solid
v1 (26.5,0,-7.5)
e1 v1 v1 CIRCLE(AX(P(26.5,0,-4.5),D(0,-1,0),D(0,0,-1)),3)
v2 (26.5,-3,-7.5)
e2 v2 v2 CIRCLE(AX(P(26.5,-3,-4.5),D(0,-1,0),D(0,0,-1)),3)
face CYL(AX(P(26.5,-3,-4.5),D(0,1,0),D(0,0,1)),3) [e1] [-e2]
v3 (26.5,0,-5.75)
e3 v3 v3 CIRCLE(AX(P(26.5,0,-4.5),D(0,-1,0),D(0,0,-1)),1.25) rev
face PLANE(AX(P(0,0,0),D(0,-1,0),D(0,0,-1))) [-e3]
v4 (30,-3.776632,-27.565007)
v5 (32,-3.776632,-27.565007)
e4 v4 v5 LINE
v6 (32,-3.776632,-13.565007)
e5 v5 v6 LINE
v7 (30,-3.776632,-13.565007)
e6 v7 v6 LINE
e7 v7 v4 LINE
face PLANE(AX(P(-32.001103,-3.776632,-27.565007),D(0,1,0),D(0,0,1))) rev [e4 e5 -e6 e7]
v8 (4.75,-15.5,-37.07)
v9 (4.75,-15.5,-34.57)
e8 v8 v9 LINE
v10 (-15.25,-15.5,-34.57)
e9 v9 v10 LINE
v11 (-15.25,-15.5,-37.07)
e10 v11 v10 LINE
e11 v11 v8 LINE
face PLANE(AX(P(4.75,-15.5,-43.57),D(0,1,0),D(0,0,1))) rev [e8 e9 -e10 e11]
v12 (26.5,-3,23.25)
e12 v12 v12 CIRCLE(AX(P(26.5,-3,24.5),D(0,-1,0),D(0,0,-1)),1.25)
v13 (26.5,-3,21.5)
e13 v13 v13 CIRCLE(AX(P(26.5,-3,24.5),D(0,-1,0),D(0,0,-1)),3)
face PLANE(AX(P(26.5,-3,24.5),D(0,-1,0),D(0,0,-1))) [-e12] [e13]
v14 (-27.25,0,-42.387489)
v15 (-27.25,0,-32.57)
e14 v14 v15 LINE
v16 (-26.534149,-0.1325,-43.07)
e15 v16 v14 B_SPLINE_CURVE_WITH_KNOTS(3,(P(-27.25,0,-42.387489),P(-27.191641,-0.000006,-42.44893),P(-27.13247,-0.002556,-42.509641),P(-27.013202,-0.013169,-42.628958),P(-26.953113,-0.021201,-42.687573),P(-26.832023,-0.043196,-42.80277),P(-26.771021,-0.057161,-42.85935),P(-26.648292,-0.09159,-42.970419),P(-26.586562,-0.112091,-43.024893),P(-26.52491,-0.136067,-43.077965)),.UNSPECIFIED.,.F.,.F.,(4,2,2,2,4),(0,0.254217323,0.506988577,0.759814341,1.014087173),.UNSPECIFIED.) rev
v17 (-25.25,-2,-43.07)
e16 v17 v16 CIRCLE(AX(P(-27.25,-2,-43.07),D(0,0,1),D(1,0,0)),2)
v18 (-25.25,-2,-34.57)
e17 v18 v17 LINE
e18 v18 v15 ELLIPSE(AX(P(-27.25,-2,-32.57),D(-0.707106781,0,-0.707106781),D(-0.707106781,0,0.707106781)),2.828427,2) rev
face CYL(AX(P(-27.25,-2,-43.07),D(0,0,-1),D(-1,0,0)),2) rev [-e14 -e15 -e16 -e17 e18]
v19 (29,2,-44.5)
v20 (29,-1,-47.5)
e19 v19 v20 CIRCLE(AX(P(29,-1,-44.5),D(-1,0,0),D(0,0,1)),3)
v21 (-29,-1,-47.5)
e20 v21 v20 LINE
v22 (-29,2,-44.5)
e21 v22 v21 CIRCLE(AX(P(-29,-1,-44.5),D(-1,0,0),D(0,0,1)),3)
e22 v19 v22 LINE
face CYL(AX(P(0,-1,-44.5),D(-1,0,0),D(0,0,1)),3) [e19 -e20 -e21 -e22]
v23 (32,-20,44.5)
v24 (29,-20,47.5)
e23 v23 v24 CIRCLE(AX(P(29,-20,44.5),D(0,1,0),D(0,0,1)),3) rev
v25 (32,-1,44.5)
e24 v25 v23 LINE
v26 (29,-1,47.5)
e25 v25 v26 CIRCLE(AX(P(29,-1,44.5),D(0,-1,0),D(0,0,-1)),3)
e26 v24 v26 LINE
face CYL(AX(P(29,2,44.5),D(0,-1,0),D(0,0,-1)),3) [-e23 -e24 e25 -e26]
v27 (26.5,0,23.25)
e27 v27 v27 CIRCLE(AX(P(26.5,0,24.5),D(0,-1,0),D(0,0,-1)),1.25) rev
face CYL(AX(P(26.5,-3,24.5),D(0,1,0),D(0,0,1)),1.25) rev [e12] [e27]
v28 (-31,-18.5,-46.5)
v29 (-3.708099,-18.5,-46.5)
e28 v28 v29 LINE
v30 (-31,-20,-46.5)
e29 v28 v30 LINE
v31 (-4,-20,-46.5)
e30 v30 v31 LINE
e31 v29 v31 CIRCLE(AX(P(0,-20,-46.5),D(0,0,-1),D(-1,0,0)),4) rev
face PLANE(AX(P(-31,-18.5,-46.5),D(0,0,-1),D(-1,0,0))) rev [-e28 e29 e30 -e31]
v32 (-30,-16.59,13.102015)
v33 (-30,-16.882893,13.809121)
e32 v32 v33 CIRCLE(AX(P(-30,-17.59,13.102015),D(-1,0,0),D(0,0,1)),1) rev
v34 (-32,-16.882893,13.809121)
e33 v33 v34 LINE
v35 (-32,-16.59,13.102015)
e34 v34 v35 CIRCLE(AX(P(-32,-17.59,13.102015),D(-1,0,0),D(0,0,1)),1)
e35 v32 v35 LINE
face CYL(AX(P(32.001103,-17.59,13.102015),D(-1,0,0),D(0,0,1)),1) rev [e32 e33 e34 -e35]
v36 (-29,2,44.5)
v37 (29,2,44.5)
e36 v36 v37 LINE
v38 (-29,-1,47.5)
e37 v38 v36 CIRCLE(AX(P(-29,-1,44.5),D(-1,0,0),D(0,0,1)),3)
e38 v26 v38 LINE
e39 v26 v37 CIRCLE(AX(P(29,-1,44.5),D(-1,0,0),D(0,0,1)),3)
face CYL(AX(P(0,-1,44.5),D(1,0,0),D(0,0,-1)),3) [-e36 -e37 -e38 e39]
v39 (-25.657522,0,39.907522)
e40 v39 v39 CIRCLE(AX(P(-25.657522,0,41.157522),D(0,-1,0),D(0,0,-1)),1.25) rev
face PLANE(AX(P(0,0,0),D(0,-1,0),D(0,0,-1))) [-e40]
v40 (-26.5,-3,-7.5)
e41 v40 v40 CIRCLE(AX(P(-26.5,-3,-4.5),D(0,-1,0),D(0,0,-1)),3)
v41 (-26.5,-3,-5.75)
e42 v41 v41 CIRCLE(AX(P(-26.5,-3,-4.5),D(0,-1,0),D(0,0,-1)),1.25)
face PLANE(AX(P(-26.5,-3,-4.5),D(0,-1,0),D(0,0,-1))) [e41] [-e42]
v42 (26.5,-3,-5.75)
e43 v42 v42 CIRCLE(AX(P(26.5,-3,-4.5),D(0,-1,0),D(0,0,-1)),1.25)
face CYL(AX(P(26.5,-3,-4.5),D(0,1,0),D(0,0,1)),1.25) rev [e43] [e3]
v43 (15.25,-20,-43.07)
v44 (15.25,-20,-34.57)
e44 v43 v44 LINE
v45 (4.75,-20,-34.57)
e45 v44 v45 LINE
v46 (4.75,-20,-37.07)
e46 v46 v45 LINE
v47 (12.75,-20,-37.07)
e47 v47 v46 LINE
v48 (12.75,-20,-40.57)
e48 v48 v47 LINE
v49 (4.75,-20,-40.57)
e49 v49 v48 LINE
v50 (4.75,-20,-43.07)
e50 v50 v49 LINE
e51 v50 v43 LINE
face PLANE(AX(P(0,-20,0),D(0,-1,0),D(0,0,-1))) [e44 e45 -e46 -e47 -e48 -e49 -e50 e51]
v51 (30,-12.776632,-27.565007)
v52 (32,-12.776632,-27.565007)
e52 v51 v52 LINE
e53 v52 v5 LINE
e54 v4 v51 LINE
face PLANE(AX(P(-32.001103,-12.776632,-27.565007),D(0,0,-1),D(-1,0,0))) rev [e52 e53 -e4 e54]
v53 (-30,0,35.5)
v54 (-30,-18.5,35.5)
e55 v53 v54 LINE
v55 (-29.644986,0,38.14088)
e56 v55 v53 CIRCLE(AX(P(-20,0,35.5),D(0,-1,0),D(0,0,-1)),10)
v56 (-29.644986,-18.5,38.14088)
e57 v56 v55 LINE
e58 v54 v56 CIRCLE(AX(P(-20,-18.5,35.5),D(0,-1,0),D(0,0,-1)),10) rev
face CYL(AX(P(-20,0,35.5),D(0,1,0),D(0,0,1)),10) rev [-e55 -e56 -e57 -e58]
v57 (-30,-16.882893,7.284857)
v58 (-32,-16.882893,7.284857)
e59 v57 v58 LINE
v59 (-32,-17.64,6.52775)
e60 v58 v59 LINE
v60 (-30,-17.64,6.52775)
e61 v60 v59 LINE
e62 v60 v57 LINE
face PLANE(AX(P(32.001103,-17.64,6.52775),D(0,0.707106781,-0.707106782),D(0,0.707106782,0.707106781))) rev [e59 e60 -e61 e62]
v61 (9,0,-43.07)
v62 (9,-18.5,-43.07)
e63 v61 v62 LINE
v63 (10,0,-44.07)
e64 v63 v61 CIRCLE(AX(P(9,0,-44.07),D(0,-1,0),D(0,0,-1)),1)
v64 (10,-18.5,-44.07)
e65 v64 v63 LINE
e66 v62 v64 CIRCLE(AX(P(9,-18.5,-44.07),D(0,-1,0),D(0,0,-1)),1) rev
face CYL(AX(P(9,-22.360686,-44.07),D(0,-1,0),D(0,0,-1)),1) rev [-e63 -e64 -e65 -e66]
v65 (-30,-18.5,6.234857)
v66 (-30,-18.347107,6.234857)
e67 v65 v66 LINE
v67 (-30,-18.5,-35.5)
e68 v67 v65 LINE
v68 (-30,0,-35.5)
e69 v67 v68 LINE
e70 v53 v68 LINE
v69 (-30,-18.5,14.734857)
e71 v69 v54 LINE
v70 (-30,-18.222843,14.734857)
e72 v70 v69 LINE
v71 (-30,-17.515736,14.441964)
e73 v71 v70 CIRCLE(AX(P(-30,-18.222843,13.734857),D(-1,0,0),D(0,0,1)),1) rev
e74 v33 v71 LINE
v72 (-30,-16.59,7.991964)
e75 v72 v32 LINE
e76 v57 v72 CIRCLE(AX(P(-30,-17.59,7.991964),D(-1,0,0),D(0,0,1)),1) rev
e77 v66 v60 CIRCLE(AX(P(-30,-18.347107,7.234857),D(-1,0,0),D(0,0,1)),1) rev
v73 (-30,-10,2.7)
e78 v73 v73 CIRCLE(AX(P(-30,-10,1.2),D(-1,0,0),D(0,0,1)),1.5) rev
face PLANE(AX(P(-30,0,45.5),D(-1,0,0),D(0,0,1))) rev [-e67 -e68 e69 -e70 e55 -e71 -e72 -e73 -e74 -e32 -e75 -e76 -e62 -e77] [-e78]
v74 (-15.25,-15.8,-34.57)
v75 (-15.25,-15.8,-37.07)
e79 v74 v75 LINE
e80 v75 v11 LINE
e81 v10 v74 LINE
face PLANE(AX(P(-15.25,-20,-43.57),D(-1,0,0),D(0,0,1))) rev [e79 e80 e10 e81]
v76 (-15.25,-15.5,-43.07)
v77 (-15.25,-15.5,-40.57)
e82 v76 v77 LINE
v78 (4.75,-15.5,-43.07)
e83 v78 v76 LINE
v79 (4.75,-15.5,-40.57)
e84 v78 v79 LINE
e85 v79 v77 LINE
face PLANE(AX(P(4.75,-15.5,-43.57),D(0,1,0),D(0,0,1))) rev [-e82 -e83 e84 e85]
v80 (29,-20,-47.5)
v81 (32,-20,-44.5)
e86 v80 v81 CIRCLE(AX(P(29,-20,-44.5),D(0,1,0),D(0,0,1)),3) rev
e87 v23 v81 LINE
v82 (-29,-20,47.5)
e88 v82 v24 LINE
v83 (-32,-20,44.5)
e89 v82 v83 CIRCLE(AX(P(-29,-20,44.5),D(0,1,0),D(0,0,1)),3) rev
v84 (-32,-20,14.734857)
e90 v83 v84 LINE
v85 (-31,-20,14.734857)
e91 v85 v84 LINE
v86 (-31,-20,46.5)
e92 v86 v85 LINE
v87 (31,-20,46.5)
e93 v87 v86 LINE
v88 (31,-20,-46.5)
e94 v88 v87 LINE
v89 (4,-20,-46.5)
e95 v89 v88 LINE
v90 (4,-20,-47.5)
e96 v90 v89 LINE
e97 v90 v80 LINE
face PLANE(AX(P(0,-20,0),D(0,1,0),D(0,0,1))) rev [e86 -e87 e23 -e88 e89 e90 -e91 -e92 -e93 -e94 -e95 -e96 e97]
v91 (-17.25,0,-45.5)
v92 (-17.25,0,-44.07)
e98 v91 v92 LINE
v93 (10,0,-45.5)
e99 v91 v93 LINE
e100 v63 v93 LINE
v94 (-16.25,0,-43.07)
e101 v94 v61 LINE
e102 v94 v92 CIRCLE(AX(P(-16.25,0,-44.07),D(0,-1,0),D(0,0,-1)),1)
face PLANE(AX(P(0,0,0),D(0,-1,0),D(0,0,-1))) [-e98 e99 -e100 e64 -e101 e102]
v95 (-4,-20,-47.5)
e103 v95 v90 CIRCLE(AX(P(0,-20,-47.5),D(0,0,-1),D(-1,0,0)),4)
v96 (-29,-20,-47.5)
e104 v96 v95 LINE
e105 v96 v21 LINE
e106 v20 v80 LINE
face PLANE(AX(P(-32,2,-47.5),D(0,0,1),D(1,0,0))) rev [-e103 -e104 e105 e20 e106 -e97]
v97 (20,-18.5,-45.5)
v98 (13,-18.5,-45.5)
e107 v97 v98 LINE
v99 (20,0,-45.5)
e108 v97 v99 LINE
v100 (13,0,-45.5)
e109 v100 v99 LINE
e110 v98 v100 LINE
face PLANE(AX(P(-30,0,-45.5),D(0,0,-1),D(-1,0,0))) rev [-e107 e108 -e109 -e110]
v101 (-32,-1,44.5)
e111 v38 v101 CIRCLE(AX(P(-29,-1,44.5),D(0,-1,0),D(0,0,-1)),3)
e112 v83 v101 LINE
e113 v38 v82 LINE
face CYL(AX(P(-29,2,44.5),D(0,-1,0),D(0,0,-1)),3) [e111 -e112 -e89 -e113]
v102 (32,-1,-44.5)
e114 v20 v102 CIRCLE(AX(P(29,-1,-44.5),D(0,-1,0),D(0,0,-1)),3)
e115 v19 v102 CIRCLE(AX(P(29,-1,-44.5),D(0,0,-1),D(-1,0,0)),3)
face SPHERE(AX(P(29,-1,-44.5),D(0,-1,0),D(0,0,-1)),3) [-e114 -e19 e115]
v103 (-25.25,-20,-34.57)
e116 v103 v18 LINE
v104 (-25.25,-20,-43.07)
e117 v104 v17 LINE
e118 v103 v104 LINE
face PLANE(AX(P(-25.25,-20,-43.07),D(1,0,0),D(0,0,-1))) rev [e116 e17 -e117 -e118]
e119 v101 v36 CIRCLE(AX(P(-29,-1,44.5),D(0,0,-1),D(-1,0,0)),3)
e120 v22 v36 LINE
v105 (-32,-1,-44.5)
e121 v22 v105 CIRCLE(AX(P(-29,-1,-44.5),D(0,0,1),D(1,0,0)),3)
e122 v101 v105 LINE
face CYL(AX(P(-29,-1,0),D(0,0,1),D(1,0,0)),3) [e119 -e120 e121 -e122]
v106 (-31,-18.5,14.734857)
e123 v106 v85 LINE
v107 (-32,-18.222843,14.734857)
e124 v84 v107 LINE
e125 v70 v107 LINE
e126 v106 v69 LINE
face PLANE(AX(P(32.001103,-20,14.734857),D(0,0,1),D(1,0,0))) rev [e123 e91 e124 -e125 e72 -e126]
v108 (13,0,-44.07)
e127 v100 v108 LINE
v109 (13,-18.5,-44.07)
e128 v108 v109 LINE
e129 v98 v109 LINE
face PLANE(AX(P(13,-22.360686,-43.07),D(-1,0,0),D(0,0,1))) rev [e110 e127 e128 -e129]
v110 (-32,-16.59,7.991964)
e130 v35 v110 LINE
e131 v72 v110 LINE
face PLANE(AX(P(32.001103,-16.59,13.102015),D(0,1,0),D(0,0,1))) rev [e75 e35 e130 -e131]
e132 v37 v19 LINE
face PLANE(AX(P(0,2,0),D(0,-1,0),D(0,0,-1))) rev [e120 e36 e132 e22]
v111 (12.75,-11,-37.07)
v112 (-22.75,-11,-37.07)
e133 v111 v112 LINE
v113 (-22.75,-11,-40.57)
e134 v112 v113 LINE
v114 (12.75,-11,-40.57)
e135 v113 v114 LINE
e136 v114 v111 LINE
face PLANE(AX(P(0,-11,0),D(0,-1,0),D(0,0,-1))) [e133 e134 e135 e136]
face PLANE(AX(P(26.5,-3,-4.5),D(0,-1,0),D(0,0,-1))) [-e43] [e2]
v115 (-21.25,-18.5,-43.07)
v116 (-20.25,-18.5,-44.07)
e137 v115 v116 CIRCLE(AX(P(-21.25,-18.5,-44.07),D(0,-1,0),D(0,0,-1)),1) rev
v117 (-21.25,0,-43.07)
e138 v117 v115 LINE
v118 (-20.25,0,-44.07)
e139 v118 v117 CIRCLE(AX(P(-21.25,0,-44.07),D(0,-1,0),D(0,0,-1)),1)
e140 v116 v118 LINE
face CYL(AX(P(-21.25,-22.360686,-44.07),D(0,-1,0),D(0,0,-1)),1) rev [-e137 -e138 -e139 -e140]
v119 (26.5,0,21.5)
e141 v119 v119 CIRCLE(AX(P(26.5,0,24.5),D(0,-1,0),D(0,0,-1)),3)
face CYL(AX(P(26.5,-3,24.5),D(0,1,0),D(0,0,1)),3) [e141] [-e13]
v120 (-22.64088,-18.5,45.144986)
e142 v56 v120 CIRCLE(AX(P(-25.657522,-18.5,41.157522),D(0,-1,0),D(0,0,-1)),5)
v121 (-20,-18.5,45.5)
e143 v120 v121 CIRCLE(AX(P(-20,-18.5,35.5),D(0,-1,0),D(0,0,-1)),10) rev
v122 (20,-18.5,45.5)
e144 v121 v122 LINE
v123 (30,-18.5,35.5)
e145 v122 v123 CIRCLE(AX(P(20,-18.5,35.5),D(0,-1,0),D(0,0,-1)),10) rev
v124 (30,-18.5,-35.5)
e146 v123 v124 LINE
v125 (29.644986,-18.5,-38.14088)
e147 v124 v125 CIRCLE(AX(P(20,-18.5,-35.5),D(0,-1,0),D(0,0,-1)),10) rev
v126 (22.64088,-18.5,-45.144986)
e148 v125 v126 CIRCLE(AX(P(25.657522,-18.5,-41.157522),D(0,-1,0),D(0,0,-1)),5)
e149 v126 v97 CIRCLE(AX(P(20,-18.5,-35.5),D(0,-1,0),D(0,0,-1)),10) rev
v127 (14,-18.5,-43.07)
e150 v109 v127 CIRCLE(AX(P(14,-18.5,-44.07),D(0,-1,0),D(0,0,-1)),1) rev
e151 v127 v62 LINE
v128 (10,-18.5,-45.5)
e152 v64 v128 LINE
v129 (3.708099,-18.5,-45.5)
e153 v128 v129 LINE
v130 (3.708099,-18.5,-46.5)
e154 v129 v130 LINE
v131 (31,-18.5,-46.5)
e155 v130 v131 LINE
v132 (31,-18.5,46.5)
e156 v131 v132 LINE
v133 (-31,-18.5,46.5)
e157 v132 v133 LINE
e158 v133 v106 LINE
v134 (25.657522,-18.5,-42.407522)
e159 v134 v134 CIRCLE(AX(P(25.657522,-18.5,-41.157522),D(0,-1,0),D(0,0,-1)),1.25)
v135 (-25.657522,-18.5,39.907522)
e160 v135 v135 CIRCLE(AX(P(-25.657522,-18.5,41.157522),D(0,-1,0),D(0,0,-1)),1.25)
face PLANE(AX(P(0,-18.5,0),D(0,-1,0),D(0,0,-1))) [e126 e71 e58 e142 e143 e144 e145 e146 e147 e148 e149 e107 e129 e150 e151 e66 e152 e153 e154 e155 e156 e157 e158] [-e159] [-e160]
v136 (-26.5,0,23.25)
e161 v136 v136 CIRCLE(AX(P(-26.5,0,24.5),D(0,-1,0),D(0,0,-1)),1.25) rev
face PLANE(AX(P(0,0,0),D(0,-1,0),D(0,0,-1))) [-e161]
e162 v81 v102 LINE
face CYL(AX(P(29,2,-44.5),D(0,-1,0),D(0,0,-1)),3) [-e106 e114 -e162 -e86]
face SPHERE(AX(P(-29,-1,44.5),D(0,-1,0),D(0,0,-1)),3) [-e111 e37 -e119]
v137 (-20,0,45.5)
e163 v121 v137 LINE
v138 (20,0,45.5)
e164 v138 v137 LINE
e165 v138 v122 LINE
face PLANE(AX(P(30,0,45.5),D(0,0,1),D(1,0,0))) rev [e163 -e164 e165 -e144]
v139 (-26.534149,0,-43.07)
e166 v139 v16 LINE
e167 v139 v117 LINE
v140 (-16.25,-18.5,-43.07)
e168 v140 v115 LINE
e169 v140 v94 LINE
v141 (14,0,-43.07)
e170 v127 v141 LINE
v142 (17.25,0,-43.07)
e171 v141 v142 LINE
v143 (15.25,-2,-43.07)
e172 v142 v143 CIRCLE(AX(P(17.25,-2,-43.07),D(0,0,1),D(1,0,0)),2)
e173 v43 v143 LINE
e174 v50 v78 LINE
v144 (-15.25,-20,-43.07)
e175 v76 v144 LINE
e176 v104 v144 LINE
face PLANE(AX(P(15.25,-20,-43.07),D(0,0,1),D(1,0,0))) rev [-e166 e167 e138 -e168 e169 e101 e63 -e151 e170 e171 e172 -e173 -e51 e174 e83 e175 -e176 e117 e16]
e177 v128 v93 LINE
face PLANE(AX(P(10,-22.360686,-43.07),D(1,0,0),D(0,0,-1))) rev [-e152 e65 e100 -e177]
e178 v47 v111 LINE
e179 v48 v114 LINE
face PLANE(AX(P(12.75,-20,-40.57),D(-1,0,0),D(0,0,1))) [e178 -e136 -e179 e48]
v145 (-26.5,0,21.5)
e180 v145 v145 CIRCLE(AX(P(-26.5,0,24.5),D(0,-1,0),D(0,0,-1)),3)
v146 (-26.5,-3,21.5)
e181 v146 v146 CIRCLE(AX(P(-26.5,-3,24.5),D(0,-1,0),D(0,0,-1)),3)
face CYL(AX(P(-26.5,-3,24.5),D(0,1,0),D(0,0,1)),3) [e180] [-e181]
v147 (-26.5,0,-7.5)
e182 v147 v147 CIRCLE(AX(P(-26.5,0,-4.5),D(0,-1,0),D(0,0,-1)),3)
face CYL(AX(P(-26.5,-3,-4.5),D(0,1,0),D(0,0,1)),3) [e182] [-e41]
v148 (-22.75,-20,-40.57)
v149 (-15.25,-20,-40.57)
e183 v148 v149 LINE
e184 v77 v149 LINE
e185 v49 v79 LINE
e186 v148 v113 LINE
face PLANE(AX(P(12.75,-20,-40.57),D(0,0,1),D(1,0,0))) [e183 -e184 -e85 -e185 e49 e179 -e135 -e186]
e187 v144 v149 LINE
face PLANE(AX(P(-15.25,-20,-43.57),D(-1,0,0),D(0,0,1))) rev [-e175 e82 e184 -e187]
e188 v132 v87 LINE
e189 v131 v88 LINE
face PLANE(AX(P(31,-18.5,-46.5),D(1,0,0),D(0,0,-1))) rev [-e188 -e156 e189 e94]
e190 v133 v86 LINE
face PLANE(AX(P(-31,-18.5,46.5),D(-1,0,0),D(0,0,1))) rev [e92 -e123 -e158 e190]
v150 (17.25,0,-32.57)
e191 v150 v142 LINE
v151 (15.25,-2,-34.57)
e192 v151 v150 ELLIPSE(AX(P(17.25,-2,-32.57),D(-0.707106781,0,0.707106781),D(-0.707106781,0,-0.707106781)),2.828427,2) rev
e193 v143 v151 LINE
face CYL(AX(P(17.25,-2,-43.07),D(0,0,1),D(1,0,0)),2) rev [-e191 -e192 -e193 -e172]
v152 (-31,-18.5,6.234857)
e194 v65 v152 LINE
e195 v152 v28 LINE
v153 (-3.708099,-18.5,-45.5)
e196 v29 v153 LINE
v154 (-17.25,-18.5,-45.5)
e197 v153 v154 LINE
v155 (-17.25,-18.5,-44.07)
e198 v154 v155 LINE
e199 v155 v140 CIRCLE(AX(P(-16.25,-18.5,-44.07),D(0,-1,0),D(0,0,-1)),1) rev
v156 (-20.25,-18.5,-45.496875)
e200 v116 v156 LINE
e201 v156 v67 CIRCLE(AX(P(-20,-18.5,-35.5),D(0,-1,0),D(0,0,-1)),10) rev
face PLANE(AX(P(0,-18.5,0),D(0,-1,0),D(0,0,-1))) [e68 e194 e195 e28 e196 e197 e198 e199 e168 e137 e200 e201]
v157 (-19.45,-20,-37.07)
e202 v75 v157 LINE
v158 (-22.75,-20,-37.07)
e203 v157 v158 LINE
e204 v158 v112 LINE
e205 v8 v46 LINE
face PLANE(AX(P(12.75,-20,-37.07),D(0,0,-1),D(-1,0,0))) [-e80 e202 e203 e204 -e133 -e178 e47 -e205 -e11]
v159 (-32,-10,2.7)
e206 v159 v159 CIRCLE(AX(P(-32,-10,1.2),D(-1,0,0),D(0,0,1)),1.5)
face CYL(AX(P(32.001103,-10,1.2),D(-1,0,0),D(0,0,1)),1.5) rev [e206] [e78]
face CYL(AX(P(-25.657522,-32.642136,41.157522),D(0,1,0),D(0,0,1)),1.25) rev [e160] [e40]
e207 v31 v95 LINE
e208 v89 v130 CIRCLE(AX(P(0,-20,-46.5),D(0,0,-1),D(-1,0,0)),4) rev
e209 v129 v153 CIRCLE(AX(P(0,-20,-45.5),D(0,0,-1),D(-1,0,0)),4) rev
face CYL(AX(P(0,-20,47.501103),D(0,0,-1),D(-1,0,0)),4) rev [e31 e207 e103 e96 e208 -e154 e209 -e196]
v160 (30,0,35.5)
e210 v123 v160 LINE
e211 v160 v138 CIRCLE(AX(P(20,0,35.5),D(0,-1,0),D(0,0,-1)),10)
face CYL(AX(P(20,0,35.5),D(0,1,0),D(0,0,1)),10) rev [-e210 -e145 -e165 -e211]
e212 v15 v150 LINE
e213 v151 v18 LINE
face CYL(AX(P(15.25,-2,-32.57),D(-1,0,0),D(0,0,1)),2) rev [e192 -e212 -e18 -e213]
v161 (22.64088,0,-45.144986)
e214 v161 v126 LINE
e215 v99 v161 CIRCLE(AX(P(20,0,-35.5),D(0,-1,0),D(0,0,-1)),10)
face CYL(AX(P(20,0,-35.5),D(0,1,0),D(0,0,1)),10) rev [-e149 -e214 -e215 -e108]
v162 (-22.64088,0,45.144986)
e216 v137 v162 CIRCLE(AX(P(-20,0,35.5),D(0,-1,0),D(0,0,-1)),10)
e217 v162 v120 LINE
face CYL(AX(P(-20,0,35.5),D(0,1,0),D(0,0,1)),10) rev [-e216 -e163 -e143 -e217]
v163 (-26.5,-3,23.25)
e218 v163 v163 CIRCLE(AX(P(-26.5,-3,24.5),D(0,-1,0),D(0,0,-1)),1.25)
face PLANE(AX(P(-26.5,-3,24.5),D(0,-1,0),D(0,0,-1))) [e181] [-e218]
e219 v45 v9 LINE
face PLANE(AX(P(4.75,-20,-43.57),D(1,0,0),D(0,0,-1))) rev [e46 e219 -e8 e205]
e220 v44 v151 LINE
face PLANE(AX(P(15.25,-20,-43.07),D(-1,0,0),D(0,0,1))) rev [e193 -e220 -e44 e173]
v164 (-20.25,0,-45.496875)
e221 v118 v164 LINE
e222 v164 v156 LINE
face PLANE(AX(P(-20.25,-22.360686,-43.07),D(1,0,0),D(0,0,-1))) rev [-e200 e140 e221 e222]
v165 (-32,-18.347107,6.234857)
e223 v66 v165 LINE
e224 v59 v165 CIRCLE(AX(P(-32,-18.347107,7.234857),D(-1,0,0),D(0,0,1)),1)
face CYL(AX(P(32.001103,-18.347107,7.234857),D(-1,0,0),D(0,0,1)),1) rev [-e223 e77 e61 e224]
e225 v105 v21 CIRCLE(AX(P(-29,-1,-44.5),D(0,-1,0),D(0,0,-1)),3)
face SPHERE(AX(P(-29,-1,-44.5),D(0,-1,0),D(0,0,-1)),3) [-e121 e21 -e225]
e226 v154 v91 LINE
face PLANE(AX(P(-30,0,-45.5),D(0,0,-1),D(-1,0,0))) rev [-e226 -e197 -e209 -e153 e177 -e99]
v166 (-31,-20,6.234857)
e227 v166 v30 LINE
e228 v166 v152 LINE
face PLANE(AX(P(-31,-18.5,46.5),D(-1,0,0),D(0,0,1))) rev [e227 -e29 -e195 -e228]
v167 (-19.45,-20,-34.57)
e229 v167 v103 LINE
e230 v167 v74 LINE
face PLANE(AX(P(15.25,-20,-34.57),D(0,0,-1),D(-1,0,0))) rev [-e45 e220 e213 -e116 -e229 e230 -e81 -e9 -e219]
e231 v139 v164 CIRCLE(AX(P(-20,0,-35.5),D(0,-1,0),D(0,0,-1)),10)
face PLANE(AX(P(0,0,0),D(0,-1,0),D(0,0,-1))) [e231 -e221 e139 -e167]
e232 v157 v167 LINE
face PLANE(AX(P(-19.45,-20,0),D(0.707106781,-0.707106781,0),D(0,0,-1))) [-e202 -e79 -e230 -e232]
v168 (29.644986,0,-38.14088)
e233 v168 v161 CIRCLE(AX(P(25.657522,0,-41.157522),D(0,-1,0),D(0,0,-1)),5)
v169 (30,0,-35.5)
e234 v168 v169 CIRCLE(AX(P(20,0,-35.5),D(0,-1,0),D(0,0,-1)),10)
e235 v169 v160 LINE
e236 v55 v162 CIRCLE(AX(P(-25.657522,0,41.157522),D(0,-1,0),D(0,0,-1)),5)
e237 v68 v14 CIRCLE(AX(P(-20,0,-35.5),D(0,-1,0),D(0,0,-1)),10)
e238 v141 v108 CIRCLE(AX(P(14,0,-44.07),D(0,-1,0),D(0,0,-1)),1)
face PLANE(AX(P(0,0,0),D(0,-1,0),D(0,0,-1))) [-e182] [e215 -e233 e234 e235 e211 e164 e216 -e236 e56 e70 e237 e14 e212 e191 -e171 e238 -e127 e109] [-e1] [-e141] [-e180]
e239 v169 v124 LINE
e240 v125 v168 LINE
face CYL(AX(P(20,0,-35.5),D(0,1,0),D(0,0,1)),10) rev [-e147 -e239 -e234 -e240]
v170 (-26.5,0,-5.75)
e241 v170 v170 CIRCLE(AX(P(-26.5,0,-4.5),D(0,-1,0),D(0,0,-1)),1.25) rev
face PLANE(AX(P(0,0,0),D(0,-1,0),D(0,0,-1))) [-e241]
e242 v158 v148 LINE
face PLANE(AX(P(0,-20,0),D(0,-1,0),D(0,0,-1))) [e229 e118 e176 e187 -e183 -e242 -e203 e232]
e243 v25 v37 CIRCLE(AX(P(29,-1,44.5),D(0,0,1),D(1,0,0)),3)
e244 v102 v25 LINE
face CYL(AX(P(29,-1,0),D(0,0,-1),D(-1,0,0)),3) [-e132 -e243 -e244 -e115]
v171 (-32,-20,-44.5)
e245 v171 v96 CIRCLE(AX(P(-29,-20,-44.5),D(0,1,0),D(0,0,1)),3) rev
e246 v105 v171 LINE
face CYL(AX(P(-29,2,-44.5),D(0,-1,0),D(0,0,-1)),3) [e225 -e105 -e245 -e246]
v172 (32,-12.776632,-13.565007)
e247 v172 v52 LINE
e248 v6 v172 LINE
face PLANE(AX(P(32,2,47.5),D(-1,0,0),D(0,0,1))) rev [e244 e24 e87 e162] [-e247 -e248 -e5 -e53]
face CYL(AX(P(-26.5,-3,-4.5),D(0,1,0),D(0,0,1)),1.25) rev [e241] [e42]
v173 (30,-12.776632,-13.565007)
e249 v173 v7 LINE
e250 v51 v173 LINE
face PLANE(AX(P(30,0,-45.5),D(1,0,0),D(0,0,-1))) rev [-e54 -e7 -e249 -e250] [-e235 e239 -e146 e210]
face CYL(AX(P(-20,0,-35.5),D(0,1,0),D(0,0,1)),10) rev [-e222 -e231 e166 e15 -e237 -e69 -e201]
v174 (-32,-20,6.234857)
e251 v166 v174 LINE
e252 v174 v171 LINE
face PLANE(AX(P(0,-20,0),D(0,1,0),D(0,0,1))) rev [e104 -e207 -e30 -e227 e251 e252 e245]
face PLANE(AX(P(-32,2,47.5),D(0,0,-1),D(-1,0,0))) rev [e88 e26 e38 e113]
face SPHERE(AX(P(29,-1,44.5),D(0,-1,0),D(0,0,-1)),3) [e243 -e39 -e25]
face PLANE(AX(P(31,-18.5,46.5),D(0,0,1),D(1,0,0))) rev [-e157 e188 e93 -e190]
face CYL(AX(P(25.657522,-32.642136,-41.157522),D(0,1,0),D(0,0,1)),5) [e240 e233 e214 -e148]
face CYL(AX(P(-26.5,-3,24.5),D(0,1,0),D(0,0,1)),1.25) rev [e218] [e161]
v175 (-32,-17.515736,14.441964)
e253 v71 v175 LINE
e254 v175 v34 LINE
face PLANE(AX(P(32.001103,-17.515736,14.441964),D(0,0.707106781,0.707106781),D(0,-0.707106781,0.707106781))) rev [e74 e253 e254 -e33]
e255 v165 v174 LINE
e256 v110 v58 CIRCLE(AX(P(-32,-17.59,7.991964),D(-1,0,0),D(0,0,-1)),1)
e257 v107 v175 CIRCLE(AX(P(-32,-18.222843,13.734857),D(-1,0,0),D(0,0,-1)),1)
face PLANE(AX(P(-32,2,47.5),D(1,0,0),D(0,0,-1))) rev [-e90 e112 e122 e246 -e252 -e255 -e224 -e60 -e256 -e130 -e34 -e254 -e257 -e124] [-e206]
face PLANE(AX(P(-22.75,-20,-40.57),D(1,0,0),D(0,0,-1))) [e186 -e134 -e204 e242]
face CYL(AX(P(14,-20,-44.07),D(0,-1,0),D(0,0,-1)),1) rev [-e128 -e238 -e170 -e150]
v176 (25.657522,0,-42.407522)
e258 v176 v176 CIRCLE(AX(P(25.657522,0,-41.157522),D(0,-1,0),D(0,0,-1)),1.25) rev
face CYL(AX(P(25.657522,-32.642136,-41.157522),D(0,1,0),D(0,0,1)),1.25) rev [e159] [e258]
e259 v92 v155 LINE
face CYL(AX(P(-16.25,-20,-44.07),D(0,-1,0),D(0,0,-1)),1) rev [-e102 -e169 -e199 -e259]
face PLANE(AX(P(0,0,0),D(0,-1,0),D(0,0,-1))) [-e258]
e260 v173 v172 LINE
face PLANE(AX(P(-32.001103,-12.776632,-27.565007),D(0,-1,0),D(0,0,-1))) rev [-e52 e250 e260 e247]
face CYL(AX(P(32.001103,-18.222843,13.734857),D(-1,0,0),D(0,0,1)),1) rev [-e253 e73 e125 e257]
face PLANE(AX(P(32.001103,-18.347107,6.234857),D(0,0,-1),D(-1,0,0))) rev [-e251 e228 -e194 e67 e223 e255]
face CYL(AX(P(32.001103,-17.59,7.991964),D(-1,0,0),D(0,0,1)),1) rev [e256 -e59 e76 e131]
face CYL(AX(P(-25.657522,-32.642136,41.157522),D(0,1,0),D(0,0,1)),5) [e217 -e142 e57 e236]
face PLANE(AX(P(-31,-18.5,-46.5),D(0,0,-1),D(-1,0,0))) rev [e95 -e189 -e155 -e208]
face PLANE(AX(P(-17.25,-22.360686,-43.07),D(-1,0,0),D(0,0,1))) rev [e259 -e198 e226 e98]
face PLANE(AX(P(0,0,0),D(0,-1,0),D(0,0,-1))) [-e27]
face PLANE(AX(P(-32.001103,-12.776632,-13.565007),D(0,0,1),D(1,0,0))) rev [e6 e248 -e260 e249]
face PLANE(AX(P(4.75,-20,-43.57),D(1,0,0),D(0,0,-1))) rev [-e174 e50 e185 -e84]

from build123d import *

# Parameters (mm, degrees)
SKETCH1_W           = 64
SKETCH1_H           = 95
BOSS_EXTRUDE1_DEPTH = 2
BOSS_EXTRUDE2_DEPTH = 20
CUT_EXTRUDE1_DEPTH  = 1.5
FILLET1_R           = 10
SKETCH3_R           = 3.0000000000000004
SKETCH3_R_2         = 1.2500000000000013
SKETCH3_R_3         = 3.000000000000001
SKETCH3_R_4         = 1.2500000000000009
BOSS_EXTRUDE3_DEPTH = 3
CUT_EXTRUDE3_REACH  = 84.172
CUT_EXTRUDE4_REACH  = 84.172
SKETCH10_R          = 1.4999999999999996
CUT_EXTRUDE5_REACH  = 104.22
SKETCH11_R          = 4
BOSS_EXTRUDE4_DEPTH = 20
SKETCH15_W          = 35.50000000000001
SKETCH15_H          = 3.499999999999986
BOSS_EXTRUDE5_DEPTH = 11
CUT_EXTRUDE6_DEPTH  = 9
CHAMFER4_SIZE       = 4.2
SKETCH18_R          = 4.999999999999999
SKETCH18_R_2        = 1.2500000000000013
SKETCH18_R_3        = 1.2500000000000113
BOSS_EXTRUDE6_DEPTH = 18.5
CUT_EXTRUDE7_REACH  = 84.172
FILLET2_R           = 3
FILLET3_R           = 3
SKETCH20_W          = 3.0000000000000036
SKETCH20_H          = 2.4299999999999855
SKETCH20_W_2        = 2.9999999999999964
SKETCH20_H_2        = 2.4299999999999926
BOSS_EXTRUDE7_DEPTH = 18.5
FILLET6_R           = 1
FILLET7_R           = 2


with BuildPart() as part:
    # Sketch1 → Boss-Extrude1 (new body)
    with BuildSketch(Plane(origin=(0, 0, 0), x_dir=(1, 0, 0), z_dir=(0, 1, 0))):
        Rectangle(SKETCH1_W, SKETCH1_H)
    extrude(amount=BOSS_EXTRUDE1_DEPTH)

    # 3DSketch3 → Boss-Extrude2 (add)
    with BuildSketch(Plane(origin=(-29.999999999999986, 0, 45.49999999999999), x_dir=(0.554700196225229, 0, -0.8320502943378437), z_dir=(0, 1, 0))):
        Polygon((-2.7735009811261575, 0.5547001962252318), (76.27127698096902, 53.251218837622), (111.77208953938367, 0), (32.727311577288496, -52.69651864139676), align=None)
        Polygon((0, 0), (75.71657678474375, 50.47771785649584), (108.9985885582575, 0.554700196225201), (33.28201177351374, -49.923017660270624), align=None, mode=Mode.SUBTRACT)
    extrude(amount=-BOSS_EXTRUDE2_DEPTH)

    # Sketch2 → Cut-Extrude1 (cut)
    with BuildSketch(Plane.XZ.offset(20)):
        Polygon((31, 46.50000000000001), (-30.999999999999993, 46.50000000000001), (-30.999999999999993, -46.50000000000001), (31.000000000000007, -46.50000000000001), align=None)
    extrude(amount=-CUT_EXTRUDE1_DEPTH, mode=Mode.SUBTRACT)

    # Fillet1
    fillet1_edges = [part.edges().sort_by_distance(p)[0] for p in [
        (30.000000000000014, -9.25, -45.49999999999998),
        (-30, -9.25, -45.49999999999998),
        (30.000000000000007, -9.25, 45.5),
        (-29.999999999999986, -9.25, 45.49999999999999),
    ]]
    fillet(fillet1_edges, radius=FILLET1_R)

    # Sketch3 → Boss-Extrude3 (add)
    # profile 1 of 4: a face of its own
    with BuildSketch(Plane.XZ):
        with Locations(Location((-26.500000000000004, 24.500000000000004, 0), (0, 0, 270))):
            Circle(SKETCH3_R)
        with Locations(Location((-26.500000000000004, 24.500000000000004, 0), (0, 0, 270))):
            Circle(SKETCH3_R_2, mode=Mode.SUBTRACT)
    # profile 2 of 4: a face of its own
    with BuildSketch(Plane.XZ):
        with Locations(Location((26.499999999999996, 24.5, 0), (0, 0, 270))):
            Circle(SKETCH3_R)
        with Locations(Location((26.499999999999996, 24.5, 0), (0, 0, 270))):
            Circle(SKETCH3_R_2, mode=Mode.SUBTRACT)
    # profile 3 of 4: a face of its own
    with BuildSketch(Plane.XZ):
        with Locations(Location((26.500000000000004, -4.499999999999999, 0), (0, 0, 270))):
            Circle(SKETCH3_R_3)
        with Locations(Location((26.500000000000004, -4.499999999999999, 0), (0, 0, 270))):
            Circle(SKETCH3_R_4, mode=Mode.SUBTRACT)
    # profile 4 of 4: a face of its own
    with BuildSketch(Plane.XZ):
        with Locations(Location((-26.500000000000004, -4.499999999999999, 0), (0, 0, 270))):
            Circle(SKETCH3_R_3)
        with Locations(Location((-26.500000000000004, -4.499999999999999, 0), (0, 0, 270))):
            Circle(SKETCH3_R_4, mode=Mode.SUBTRACT)
    extrude(amount=BOSS_EXTRUDE3_DEPTH)

    # Sketch9 → Cut-Extrude3 (cut, up to next)
    with BuildSketch(Plane.ZY.offset(31.999999999999993), mode=Mode.PRIVATE) as cut_extrude3_sk1:
        with BuildLine():
            Line((14.734857240872076, -20), (14.734857240872076, -18.222842712535012))
            ThreePointArc((14.734857240872076, -18.222842712535012), (14.658736773383362, -17.840159280169924), (14.441964022058624, -17.51573593134847))
            Line((14.441964022058624, -17.51573593134847), (13.809121309524503, -16.882893218814356))
            ThreePointArc((13.809121309524503, -16.882893218814356), (13.484697960703047, -16.666120467489616), (13.102014528337957, -16.5900000000009))
            Line((13.102014528337957, -16.5900000000009), (7.99196401996333, -16.5900000000009))
            ThreePointArc((7.99196401996333, -16.5900000000009), (7.609280587197636, -16.666120467655695), (7.284857238163581, -16.882893219427746))
            Line((7.284857238163581, -16.882893219427746), (6.527750459072318, -17.63999999983213))
            ThreePointArc((6.527750459072318, -17.63999999983213), (6.310977708194816, -17.964423348440974), (6.234857240871916, -18.34710678040548))
            Line((6.234857240871916, -18.34710678040548), (6.234857240871916, -20))
            Line((6.234857240871916, -20), (14.734857240872076, -20))
        make_face()
    cut_extrude3_tool1 = extrude(cut_extrude3_sk1.sketch, amount=-CUT_EXTRUDE3_REACH, mode=Mode.PRIVATE) & part.part
    add(cut_extrude3_tool1.solids().sort_by_distance((-32, -18.37521, 10.505834))[0], mode=Mode.SUBTRACT)

    # Sketch10 → Cut-Extrude4 (cut, up to next)
    with BuildSketch(Plane.ZY.offset(31.999999999999993), mode=Mode.PRIVATE) as cut_extrude4_sk1:
        with Locations((1.2, -10)):
            Circle(SKETCH10_R)
    cut_extrude4_tool1 = extrude(cut_extrude4_sk1.sketch, amount=-CUT_EXTRUDE4_REACH, mode=Mode.PRIVATE) & part.part
    add(cut_extrude4_tool1.solids().sort_by_distance((-32, -10, 1.2))[0], mode=Mode.SUBTRACT)

    # Sketch11 → Cut-Extrude5 (cut, up to next)
    with BuildSketch(Plane(origin=(0, 0, -47.5), x_dir=(-1, 0, 0), z_dir=(0, 0, -1)), mode=Mode.PRIVATE) as cut_extrude5_sk1:
        with Locations((-6.94e-15, -20)):
            Circle(SKETCH11_R)
    cut_extrude5_tool1 = extrude(cut_extrude5_sk1.sketch, amount=-CUT_EXTRUDE5_REACH, mode=Mode.PRIVATE) & part.part
    add(cut_extrude5_tool1.solids().sort_by_distance((0, -20, -47.5))[0], mode=Mode.SUBTRACT)

    # Sketch13 → Boss-Extrude4 (add)
    with BuildSketch(Plane.XZ):
        Polygon((15.250000000000018, -43.06999999999999), (-25.249999999999986, -43.07), (-25.249999999999986, -34.56999999999999), (15.250000000000018, -34.56999999999999), align=None)
        Polygon((12.750000000000016, -40.569999999999986), (12.750000000000016, -37.06999999999999), (-22.74999999999999, -37.07), (-22.74999999999999, -40.569999999999986), align=None, mode=Mode.SUBTRACT)
    extrude(amount=BOSS_EXTRUDE4_DEPTH)

    # Sketch15 → Boss-Extrude5 (add)
    with BuildSketch(Plane.XZ):
        with Locations((-4.999999999999987, -38.81999999999999)):
            Rectangle(SKETCH15_W, SKETCH15_H)
    extrude(amount=BOSS_EXTRUDE5_DEPTH)

    # Sketch17 → Cut-Extrude6 (cut)
    with BuildSketch(Plane.XY.offset(-34.56999999999999)):
        Polygon((4.7500000000000115, -20), (-15.24999999999999, -20.000000000000004), (-15.24999999999999, -15.5), (4.7500000000000115, -15.5), align=None)
    extrude(amount=-CUT_EXTRUDE6_DEPTH, mode=Mode.SUBTRACT)

    # Chamfer4
    chamfer4_edges = [part.edges().sort_by_distance(p)[0] for p in [
        (-15.249999999999984, -20.000000000000004, -35.81999999999999),
    ]]
    chamfer(chamfer4_edges, length=CHAMFER4_SIZE)

    # Sketch18 → Boss-Extrude6 (add)
    # profile 1 of 2: a face of its own
    with BuildSketch(Plane.XZ):
        with Locations((25.65752160816483, -41.15752160816483)):
            Circle(SKETCH18_R)
        with Locations(Location((25.65752160816483, -41.15752160816483, 0), (0, 0, 270))):
            Circle(SKETCH18_R_2, mode=Mode.SUBTRACT)
    # profile 2 of 2: a face of its own
    with BuildSketch(Plane.XZ):
        with Locations((-25.657521608164807, 41.15752160816483)):
            Circle(SKETCH18_R)
        with Locations(Location((-25.657521608164807, 41.15752160816483, 0), (0, 0, 270))):
            Circle(SKETCH18_R_3, mode=Mode.SUBTRACT)
    extrude(amount=BOSS_EXTRUDE6_DEPTH)

    # Sketch19 → Cut-Extrude7 (cut, up to next)
    with BuildSketch(Plane(origin=(32.00000000000001, 0, 0), x_dir=(0, 0, -1), z_dir=(1, 0, 0)), mode=Mode.PRIVATE) as cut_extrude7_sk1:
        Polygon((27.565006511475303, -12.776632247834925), (13.565006511475303, -12.776632247834925), (13.565006511475303, -3.7766322478349266), (27.565006511475303, -3.776632247834925), align=None)
    cut_extrude7_tool1 = extrude(cut_extrude7_sk1.sketch, amount=-CUT_EXTRUDE7_REACH, mode=Mode.PRIVATE) & part.part
    add(cut_extrude7_tool1.solids().sort_by_distance((32, -8.276632, -20.565007))[0], mode=Mode.SUBTRACT)

    # Fillet2
    fillet2_edges = [part.edges().sort_by_distance(p)[0] for p in [
        (32, -9, 47.5),
        (-31.999999999999993, -9, 47.5),
        (-31.999999999999993, -9, -47.500000000000014),
        (32.00000000000001, -9, -47.5),
    ]]
    fillet(fillet2_edges, radius=FILLET2_R)

    # Fillet3
    fillet3_edges = [part.edges().sort_by_distance(p)[0] for p in [
        (32.00000000000001, 2, 0),
        (1.421e-14, 2, 47.5),
        (7.11e-15, 2, -47.5),
        (-31.999999999999993, 2, 0),
        (31.121320343559645, 2.000000000000001, -46.62132034355964),
        (-31.121320343559635, 2.000000000000002, -46.621320343559645),
        (-31.121320343559635, 2, 46.621320343559645),
        (31.121320343559663, 1.9999999999999987, 46.621320343559645),
    ]]
    fillet(fillet3_edges, radius=FILLET3_R)

    # Sketch20 → Boss-Extrude7 (add)
    with BuildSketch(Plane.XZ):
        with Locations((11.500000000000018, -44.285)):
            Rectangle(SKETCH20_W, SKETCH20_H)
        with Locations((-18.749999999999986, -44.285)):
            Rectangle(SKETCH20_W_2, SKETCH20_H_2)
    extrude(amount=BOSS_EXTRUDE7_DEPTH)

    # Fillet6
    fillet6_edges = [part.edges().sort_by_distance(p)[0] for p in [
        (10.000000000000016, -9.25, -43.07),
        (13.000000000000018, -9.25, -43.07),
        (-20.249999999999982, -9.25, -43.07),
        (-17.249999999999986, -9.25, -43.07),
    ]]
    fillet(fillet6_edges, radius=FILLET6_R)

    # Fillet7
    # the kernel refuses this fillet: 2 mm, written as the material it adds along each edge
    with BuildSketch(Plane(origin=(15.250000000000018, 0, -34.56999999999999), x_dir=(1, 0, 0), z_dir=(0, 0, -1))) as fillet7_piece_1:
        with BuildLine():
            CenterArc((FILLET7_R, FILLET7_R), FILLET7_R, 180, 90)
            Line((0, FILLET7_R), (-FILLET7_R * 0.02, FILLET7_R))
            Line((-FILLET7_R * 0.02, FILLET7_R), (-FILLET7_R * 0.02, -FILLET7_R * 0.02))
            Line((-FILLET7_R * 0.02, -FILLET7_R * 0.02), (FILLET7_R, -FILLET7_R * 0.02))
            Line((FILLET7_R, -FILLET7_R * 0.02), (FILLET7_R, 0))
        make_face()
    extrude(amount=8.5)
    with BuildSketch(Plane(origin=(-25.249999999999986, 0, -34.56999999999999), x_dir=(0, 0, 1), z_dir=(1, 0, 0))) as fillet7_piece_2:
        with BuildLine():
            CenterArc((FILLET7_R, FILLET7_R), FILLET7_R, 180, 90)
            Line((0, FILLET7_R), (-FILLET7_R * 0.02, FILLET7_R))
            Line((-FILLET7_R * 0.02, FILLET7_R), (-FILLET7_R * 0.02, -FILLET7_R * 0.02))
            Line((-FILLET7_R * 0.02, -FILLET7_R * 0.02), (FILLET7_R, -FILLET7_R * 0.02))
            Line((FILLET7_R, -FILLET7_R * 0.02), (FILLET7_R, 0))
        make_face()
    extrude(amount=40.5)
    with BuildSketch(Plane(origin=(-25.249999999999986, 0, -43.07), x_dir=(-1, 0, 0), z_dir=(0, 0, 1))) as fillet7_piece_3:
        with BuildLine():
            CenterArc((FILLET7_R, FILLET7_R), FILLET7_R, 180, 90)
            Line((0, FILLET7_R), (-FILLET7_R * 0.02, FILLET7_R))
            Line((-FILLET7_R * 0.02, FILLET7_R), (-FILLET7_R * 0.02, -FILLET7_R * 0.02))
            Line((-FILLET7_R * 0.02, -FILLET7_R * 0.02), (FILLET7_R, -FILLET7_R * 0.02))
            Line((FILLET7_R, -FILLET7_R * 0.02), (FILLET7_R, 0))
        make_face()
    extrude(amount=8.500000000000007)
    with BuildSketch(Plane(origin=(-25.249999999999986, 0, -34.56999999999999), x_dir=(0, 0, 1), z_dir=(1, 0, 0))) as fillet7_piece_4a_section:
        with BuildLine():
            CenterArc((FILLET7_R, FILLET7_R), FILLET7_R, 180, 90)
            Line((0, FILLET7_R), (-FILLET7_R * 0.02, FILLET7_R))
            Line((-FILLET7_R * 0.02, FILLET7_R), (-FILLET7_R * 0.02, -FILLET7_R * 0.02))
            Line((-FILLET7_R * 0.02, -FILLET7_R * 0.02), (FILLET7_R, -FILLET7_R * 0.02))
            Line((FILLET7_R, -FILLET7_R * 0.02), (FILLET7_R, 0))
        make_face()
    fillet7_piece_4a = extrude(amount=45.50000000000001, mode=Mode.PRIVATE)
    fillet7_piece_4a = split(fillet7_piece_4a, bisect_by=Plane(origin=(15.250000000000018, -0.4527902285336496, -34.11720977146634), z_dir=(1, 0, 0)), keep=Keep.TOP, mode=Mode.PRIVATE)
    with BuildSketch(Plane(origin=(15.250000000000018, 0, -29.569999999999993), x_dir=(1, 0, 0), z_dir=(0, 0, -1))) as fillet7_piece_4b_section:
        with BuildLine():
            CenterArc((FILLET7_R, FILLET7_R), FILLET7_R, 180, 90)
            Line((0, FILLET7_R), (-FILLET7_R * 0.02, FILLET7_R))
            Line((-FILLET7_R * 0.02, FILLET7_R), (-FILLET7_R * 0.02, -FILLET7_R * 0.02))
            Line((-FILLET7_R * 0.02, -FILLET7_R * 0.02), (FILLET7_R, -FILLET7_R * 0.02))
            Line((FILLET7_R, -FILLET7_R * 0.02), (FILLET7_R, 0))
        make_face()
    fillet7_piece_4b = extrude(amount=13.5, mode=Mode.PRIVATE)
    fillet7_piece_4b = split(fillet7_piece_4b, bisect_by=Plane(origin=(15.702790228533665, -0.45279022853364864, -34.56999999999999), z_dir=(0, 0, 1)), keep=Keep.TOP, mode=Mode.PRIVATE)
    fillet7_piece_4 = fillet7_piece_4a & fillet7_piece_4b
    add(fillet7_piece_4)
    with BuildSketch(Plane(origin=(-25.249999999999986, 0, -43.07), x_dir=(-1, 0, 0), z_dir=(0, 0, 1))) as fillet7_piece_5a_section:
        with BuildLine():
            CenterArc((FILLET7_R, FILLET7_R), FILLET7_R, 180, 90)
            Line((0, FILLET7_R), (-FILLET7_R * 0.02, FILLET7_R))
            Line((-FILLET7_R * 0.02, FILLET7_R), (-FILLET7_R * 0.02, -FILLET7_R * 0.02))
            Line((-FILLET7_R * 0.02, -FILLET7_R * 0.02), (FILLET7_R, -FILLET7_R * 0.02))
            Line((FILLET7_R, -FILLET7_R * 0.02), (FILLET7_R, 0))
        make_face()
    fillet7_piece_5a = extrude(amount=13.500000000000007, mode=Mode.PRIVATE)
    fillet7_piece_5a = split(fillet7_piece_5a, bisect_by=Plane(origin=(-25.702790228533637, -0.4527902285336497, -34.56999999999999), z_dir=(0, 0, 1)), keep=Keep.TOP, mode=Mode.PRIVATE)
    with BuildSketch(Plane(origin=(-30.249999999999986, 0, -34.56999999999999), x_dir=(0, 0, 1), z_dir=(1, 0, 0))) as fillet7_piece_5b_section:
        with BuildLine():
            CenterArc((FILLET7_R, FILLET7_R), FILLET7_R, 180, 90)
            Line((0, FILLET7_R), (-FILLET7_R * 0.02, FILLET7_R))
            Line((-FILLET7_R * 0.02, FILLET7_R), (-FILLET7_R * 0.02, -FILLET7_R * 0.02))
            Line((-FILLET7_R * 0.02, -FILLET7_R * 0.02), (FILLET7_R, -FILLET7_R * 0.02))
            Line((FILLET7_R, -FILLET7_R * 0.02), (FILLET7_R, 0))
        make_face()
    fillet7_piece_5b = extrude(amount=45.5, mode=Mode.PRIVATE)
    fillet7_piece_5b = split(fillet7_piece_5b, bisect_by=Plane(origin=(-25.249999999999986, -0.4527902285336496, -34.11720977146634), z_dir=(-1, 0, 0)), keep=Keep.TOP, mode=Mode.PRIVATE)
    fillet7_piece_5 = fillet7_piece_5a & fillet7_piece_5b
    add(fillet7_piece_5)


solid = part.part
